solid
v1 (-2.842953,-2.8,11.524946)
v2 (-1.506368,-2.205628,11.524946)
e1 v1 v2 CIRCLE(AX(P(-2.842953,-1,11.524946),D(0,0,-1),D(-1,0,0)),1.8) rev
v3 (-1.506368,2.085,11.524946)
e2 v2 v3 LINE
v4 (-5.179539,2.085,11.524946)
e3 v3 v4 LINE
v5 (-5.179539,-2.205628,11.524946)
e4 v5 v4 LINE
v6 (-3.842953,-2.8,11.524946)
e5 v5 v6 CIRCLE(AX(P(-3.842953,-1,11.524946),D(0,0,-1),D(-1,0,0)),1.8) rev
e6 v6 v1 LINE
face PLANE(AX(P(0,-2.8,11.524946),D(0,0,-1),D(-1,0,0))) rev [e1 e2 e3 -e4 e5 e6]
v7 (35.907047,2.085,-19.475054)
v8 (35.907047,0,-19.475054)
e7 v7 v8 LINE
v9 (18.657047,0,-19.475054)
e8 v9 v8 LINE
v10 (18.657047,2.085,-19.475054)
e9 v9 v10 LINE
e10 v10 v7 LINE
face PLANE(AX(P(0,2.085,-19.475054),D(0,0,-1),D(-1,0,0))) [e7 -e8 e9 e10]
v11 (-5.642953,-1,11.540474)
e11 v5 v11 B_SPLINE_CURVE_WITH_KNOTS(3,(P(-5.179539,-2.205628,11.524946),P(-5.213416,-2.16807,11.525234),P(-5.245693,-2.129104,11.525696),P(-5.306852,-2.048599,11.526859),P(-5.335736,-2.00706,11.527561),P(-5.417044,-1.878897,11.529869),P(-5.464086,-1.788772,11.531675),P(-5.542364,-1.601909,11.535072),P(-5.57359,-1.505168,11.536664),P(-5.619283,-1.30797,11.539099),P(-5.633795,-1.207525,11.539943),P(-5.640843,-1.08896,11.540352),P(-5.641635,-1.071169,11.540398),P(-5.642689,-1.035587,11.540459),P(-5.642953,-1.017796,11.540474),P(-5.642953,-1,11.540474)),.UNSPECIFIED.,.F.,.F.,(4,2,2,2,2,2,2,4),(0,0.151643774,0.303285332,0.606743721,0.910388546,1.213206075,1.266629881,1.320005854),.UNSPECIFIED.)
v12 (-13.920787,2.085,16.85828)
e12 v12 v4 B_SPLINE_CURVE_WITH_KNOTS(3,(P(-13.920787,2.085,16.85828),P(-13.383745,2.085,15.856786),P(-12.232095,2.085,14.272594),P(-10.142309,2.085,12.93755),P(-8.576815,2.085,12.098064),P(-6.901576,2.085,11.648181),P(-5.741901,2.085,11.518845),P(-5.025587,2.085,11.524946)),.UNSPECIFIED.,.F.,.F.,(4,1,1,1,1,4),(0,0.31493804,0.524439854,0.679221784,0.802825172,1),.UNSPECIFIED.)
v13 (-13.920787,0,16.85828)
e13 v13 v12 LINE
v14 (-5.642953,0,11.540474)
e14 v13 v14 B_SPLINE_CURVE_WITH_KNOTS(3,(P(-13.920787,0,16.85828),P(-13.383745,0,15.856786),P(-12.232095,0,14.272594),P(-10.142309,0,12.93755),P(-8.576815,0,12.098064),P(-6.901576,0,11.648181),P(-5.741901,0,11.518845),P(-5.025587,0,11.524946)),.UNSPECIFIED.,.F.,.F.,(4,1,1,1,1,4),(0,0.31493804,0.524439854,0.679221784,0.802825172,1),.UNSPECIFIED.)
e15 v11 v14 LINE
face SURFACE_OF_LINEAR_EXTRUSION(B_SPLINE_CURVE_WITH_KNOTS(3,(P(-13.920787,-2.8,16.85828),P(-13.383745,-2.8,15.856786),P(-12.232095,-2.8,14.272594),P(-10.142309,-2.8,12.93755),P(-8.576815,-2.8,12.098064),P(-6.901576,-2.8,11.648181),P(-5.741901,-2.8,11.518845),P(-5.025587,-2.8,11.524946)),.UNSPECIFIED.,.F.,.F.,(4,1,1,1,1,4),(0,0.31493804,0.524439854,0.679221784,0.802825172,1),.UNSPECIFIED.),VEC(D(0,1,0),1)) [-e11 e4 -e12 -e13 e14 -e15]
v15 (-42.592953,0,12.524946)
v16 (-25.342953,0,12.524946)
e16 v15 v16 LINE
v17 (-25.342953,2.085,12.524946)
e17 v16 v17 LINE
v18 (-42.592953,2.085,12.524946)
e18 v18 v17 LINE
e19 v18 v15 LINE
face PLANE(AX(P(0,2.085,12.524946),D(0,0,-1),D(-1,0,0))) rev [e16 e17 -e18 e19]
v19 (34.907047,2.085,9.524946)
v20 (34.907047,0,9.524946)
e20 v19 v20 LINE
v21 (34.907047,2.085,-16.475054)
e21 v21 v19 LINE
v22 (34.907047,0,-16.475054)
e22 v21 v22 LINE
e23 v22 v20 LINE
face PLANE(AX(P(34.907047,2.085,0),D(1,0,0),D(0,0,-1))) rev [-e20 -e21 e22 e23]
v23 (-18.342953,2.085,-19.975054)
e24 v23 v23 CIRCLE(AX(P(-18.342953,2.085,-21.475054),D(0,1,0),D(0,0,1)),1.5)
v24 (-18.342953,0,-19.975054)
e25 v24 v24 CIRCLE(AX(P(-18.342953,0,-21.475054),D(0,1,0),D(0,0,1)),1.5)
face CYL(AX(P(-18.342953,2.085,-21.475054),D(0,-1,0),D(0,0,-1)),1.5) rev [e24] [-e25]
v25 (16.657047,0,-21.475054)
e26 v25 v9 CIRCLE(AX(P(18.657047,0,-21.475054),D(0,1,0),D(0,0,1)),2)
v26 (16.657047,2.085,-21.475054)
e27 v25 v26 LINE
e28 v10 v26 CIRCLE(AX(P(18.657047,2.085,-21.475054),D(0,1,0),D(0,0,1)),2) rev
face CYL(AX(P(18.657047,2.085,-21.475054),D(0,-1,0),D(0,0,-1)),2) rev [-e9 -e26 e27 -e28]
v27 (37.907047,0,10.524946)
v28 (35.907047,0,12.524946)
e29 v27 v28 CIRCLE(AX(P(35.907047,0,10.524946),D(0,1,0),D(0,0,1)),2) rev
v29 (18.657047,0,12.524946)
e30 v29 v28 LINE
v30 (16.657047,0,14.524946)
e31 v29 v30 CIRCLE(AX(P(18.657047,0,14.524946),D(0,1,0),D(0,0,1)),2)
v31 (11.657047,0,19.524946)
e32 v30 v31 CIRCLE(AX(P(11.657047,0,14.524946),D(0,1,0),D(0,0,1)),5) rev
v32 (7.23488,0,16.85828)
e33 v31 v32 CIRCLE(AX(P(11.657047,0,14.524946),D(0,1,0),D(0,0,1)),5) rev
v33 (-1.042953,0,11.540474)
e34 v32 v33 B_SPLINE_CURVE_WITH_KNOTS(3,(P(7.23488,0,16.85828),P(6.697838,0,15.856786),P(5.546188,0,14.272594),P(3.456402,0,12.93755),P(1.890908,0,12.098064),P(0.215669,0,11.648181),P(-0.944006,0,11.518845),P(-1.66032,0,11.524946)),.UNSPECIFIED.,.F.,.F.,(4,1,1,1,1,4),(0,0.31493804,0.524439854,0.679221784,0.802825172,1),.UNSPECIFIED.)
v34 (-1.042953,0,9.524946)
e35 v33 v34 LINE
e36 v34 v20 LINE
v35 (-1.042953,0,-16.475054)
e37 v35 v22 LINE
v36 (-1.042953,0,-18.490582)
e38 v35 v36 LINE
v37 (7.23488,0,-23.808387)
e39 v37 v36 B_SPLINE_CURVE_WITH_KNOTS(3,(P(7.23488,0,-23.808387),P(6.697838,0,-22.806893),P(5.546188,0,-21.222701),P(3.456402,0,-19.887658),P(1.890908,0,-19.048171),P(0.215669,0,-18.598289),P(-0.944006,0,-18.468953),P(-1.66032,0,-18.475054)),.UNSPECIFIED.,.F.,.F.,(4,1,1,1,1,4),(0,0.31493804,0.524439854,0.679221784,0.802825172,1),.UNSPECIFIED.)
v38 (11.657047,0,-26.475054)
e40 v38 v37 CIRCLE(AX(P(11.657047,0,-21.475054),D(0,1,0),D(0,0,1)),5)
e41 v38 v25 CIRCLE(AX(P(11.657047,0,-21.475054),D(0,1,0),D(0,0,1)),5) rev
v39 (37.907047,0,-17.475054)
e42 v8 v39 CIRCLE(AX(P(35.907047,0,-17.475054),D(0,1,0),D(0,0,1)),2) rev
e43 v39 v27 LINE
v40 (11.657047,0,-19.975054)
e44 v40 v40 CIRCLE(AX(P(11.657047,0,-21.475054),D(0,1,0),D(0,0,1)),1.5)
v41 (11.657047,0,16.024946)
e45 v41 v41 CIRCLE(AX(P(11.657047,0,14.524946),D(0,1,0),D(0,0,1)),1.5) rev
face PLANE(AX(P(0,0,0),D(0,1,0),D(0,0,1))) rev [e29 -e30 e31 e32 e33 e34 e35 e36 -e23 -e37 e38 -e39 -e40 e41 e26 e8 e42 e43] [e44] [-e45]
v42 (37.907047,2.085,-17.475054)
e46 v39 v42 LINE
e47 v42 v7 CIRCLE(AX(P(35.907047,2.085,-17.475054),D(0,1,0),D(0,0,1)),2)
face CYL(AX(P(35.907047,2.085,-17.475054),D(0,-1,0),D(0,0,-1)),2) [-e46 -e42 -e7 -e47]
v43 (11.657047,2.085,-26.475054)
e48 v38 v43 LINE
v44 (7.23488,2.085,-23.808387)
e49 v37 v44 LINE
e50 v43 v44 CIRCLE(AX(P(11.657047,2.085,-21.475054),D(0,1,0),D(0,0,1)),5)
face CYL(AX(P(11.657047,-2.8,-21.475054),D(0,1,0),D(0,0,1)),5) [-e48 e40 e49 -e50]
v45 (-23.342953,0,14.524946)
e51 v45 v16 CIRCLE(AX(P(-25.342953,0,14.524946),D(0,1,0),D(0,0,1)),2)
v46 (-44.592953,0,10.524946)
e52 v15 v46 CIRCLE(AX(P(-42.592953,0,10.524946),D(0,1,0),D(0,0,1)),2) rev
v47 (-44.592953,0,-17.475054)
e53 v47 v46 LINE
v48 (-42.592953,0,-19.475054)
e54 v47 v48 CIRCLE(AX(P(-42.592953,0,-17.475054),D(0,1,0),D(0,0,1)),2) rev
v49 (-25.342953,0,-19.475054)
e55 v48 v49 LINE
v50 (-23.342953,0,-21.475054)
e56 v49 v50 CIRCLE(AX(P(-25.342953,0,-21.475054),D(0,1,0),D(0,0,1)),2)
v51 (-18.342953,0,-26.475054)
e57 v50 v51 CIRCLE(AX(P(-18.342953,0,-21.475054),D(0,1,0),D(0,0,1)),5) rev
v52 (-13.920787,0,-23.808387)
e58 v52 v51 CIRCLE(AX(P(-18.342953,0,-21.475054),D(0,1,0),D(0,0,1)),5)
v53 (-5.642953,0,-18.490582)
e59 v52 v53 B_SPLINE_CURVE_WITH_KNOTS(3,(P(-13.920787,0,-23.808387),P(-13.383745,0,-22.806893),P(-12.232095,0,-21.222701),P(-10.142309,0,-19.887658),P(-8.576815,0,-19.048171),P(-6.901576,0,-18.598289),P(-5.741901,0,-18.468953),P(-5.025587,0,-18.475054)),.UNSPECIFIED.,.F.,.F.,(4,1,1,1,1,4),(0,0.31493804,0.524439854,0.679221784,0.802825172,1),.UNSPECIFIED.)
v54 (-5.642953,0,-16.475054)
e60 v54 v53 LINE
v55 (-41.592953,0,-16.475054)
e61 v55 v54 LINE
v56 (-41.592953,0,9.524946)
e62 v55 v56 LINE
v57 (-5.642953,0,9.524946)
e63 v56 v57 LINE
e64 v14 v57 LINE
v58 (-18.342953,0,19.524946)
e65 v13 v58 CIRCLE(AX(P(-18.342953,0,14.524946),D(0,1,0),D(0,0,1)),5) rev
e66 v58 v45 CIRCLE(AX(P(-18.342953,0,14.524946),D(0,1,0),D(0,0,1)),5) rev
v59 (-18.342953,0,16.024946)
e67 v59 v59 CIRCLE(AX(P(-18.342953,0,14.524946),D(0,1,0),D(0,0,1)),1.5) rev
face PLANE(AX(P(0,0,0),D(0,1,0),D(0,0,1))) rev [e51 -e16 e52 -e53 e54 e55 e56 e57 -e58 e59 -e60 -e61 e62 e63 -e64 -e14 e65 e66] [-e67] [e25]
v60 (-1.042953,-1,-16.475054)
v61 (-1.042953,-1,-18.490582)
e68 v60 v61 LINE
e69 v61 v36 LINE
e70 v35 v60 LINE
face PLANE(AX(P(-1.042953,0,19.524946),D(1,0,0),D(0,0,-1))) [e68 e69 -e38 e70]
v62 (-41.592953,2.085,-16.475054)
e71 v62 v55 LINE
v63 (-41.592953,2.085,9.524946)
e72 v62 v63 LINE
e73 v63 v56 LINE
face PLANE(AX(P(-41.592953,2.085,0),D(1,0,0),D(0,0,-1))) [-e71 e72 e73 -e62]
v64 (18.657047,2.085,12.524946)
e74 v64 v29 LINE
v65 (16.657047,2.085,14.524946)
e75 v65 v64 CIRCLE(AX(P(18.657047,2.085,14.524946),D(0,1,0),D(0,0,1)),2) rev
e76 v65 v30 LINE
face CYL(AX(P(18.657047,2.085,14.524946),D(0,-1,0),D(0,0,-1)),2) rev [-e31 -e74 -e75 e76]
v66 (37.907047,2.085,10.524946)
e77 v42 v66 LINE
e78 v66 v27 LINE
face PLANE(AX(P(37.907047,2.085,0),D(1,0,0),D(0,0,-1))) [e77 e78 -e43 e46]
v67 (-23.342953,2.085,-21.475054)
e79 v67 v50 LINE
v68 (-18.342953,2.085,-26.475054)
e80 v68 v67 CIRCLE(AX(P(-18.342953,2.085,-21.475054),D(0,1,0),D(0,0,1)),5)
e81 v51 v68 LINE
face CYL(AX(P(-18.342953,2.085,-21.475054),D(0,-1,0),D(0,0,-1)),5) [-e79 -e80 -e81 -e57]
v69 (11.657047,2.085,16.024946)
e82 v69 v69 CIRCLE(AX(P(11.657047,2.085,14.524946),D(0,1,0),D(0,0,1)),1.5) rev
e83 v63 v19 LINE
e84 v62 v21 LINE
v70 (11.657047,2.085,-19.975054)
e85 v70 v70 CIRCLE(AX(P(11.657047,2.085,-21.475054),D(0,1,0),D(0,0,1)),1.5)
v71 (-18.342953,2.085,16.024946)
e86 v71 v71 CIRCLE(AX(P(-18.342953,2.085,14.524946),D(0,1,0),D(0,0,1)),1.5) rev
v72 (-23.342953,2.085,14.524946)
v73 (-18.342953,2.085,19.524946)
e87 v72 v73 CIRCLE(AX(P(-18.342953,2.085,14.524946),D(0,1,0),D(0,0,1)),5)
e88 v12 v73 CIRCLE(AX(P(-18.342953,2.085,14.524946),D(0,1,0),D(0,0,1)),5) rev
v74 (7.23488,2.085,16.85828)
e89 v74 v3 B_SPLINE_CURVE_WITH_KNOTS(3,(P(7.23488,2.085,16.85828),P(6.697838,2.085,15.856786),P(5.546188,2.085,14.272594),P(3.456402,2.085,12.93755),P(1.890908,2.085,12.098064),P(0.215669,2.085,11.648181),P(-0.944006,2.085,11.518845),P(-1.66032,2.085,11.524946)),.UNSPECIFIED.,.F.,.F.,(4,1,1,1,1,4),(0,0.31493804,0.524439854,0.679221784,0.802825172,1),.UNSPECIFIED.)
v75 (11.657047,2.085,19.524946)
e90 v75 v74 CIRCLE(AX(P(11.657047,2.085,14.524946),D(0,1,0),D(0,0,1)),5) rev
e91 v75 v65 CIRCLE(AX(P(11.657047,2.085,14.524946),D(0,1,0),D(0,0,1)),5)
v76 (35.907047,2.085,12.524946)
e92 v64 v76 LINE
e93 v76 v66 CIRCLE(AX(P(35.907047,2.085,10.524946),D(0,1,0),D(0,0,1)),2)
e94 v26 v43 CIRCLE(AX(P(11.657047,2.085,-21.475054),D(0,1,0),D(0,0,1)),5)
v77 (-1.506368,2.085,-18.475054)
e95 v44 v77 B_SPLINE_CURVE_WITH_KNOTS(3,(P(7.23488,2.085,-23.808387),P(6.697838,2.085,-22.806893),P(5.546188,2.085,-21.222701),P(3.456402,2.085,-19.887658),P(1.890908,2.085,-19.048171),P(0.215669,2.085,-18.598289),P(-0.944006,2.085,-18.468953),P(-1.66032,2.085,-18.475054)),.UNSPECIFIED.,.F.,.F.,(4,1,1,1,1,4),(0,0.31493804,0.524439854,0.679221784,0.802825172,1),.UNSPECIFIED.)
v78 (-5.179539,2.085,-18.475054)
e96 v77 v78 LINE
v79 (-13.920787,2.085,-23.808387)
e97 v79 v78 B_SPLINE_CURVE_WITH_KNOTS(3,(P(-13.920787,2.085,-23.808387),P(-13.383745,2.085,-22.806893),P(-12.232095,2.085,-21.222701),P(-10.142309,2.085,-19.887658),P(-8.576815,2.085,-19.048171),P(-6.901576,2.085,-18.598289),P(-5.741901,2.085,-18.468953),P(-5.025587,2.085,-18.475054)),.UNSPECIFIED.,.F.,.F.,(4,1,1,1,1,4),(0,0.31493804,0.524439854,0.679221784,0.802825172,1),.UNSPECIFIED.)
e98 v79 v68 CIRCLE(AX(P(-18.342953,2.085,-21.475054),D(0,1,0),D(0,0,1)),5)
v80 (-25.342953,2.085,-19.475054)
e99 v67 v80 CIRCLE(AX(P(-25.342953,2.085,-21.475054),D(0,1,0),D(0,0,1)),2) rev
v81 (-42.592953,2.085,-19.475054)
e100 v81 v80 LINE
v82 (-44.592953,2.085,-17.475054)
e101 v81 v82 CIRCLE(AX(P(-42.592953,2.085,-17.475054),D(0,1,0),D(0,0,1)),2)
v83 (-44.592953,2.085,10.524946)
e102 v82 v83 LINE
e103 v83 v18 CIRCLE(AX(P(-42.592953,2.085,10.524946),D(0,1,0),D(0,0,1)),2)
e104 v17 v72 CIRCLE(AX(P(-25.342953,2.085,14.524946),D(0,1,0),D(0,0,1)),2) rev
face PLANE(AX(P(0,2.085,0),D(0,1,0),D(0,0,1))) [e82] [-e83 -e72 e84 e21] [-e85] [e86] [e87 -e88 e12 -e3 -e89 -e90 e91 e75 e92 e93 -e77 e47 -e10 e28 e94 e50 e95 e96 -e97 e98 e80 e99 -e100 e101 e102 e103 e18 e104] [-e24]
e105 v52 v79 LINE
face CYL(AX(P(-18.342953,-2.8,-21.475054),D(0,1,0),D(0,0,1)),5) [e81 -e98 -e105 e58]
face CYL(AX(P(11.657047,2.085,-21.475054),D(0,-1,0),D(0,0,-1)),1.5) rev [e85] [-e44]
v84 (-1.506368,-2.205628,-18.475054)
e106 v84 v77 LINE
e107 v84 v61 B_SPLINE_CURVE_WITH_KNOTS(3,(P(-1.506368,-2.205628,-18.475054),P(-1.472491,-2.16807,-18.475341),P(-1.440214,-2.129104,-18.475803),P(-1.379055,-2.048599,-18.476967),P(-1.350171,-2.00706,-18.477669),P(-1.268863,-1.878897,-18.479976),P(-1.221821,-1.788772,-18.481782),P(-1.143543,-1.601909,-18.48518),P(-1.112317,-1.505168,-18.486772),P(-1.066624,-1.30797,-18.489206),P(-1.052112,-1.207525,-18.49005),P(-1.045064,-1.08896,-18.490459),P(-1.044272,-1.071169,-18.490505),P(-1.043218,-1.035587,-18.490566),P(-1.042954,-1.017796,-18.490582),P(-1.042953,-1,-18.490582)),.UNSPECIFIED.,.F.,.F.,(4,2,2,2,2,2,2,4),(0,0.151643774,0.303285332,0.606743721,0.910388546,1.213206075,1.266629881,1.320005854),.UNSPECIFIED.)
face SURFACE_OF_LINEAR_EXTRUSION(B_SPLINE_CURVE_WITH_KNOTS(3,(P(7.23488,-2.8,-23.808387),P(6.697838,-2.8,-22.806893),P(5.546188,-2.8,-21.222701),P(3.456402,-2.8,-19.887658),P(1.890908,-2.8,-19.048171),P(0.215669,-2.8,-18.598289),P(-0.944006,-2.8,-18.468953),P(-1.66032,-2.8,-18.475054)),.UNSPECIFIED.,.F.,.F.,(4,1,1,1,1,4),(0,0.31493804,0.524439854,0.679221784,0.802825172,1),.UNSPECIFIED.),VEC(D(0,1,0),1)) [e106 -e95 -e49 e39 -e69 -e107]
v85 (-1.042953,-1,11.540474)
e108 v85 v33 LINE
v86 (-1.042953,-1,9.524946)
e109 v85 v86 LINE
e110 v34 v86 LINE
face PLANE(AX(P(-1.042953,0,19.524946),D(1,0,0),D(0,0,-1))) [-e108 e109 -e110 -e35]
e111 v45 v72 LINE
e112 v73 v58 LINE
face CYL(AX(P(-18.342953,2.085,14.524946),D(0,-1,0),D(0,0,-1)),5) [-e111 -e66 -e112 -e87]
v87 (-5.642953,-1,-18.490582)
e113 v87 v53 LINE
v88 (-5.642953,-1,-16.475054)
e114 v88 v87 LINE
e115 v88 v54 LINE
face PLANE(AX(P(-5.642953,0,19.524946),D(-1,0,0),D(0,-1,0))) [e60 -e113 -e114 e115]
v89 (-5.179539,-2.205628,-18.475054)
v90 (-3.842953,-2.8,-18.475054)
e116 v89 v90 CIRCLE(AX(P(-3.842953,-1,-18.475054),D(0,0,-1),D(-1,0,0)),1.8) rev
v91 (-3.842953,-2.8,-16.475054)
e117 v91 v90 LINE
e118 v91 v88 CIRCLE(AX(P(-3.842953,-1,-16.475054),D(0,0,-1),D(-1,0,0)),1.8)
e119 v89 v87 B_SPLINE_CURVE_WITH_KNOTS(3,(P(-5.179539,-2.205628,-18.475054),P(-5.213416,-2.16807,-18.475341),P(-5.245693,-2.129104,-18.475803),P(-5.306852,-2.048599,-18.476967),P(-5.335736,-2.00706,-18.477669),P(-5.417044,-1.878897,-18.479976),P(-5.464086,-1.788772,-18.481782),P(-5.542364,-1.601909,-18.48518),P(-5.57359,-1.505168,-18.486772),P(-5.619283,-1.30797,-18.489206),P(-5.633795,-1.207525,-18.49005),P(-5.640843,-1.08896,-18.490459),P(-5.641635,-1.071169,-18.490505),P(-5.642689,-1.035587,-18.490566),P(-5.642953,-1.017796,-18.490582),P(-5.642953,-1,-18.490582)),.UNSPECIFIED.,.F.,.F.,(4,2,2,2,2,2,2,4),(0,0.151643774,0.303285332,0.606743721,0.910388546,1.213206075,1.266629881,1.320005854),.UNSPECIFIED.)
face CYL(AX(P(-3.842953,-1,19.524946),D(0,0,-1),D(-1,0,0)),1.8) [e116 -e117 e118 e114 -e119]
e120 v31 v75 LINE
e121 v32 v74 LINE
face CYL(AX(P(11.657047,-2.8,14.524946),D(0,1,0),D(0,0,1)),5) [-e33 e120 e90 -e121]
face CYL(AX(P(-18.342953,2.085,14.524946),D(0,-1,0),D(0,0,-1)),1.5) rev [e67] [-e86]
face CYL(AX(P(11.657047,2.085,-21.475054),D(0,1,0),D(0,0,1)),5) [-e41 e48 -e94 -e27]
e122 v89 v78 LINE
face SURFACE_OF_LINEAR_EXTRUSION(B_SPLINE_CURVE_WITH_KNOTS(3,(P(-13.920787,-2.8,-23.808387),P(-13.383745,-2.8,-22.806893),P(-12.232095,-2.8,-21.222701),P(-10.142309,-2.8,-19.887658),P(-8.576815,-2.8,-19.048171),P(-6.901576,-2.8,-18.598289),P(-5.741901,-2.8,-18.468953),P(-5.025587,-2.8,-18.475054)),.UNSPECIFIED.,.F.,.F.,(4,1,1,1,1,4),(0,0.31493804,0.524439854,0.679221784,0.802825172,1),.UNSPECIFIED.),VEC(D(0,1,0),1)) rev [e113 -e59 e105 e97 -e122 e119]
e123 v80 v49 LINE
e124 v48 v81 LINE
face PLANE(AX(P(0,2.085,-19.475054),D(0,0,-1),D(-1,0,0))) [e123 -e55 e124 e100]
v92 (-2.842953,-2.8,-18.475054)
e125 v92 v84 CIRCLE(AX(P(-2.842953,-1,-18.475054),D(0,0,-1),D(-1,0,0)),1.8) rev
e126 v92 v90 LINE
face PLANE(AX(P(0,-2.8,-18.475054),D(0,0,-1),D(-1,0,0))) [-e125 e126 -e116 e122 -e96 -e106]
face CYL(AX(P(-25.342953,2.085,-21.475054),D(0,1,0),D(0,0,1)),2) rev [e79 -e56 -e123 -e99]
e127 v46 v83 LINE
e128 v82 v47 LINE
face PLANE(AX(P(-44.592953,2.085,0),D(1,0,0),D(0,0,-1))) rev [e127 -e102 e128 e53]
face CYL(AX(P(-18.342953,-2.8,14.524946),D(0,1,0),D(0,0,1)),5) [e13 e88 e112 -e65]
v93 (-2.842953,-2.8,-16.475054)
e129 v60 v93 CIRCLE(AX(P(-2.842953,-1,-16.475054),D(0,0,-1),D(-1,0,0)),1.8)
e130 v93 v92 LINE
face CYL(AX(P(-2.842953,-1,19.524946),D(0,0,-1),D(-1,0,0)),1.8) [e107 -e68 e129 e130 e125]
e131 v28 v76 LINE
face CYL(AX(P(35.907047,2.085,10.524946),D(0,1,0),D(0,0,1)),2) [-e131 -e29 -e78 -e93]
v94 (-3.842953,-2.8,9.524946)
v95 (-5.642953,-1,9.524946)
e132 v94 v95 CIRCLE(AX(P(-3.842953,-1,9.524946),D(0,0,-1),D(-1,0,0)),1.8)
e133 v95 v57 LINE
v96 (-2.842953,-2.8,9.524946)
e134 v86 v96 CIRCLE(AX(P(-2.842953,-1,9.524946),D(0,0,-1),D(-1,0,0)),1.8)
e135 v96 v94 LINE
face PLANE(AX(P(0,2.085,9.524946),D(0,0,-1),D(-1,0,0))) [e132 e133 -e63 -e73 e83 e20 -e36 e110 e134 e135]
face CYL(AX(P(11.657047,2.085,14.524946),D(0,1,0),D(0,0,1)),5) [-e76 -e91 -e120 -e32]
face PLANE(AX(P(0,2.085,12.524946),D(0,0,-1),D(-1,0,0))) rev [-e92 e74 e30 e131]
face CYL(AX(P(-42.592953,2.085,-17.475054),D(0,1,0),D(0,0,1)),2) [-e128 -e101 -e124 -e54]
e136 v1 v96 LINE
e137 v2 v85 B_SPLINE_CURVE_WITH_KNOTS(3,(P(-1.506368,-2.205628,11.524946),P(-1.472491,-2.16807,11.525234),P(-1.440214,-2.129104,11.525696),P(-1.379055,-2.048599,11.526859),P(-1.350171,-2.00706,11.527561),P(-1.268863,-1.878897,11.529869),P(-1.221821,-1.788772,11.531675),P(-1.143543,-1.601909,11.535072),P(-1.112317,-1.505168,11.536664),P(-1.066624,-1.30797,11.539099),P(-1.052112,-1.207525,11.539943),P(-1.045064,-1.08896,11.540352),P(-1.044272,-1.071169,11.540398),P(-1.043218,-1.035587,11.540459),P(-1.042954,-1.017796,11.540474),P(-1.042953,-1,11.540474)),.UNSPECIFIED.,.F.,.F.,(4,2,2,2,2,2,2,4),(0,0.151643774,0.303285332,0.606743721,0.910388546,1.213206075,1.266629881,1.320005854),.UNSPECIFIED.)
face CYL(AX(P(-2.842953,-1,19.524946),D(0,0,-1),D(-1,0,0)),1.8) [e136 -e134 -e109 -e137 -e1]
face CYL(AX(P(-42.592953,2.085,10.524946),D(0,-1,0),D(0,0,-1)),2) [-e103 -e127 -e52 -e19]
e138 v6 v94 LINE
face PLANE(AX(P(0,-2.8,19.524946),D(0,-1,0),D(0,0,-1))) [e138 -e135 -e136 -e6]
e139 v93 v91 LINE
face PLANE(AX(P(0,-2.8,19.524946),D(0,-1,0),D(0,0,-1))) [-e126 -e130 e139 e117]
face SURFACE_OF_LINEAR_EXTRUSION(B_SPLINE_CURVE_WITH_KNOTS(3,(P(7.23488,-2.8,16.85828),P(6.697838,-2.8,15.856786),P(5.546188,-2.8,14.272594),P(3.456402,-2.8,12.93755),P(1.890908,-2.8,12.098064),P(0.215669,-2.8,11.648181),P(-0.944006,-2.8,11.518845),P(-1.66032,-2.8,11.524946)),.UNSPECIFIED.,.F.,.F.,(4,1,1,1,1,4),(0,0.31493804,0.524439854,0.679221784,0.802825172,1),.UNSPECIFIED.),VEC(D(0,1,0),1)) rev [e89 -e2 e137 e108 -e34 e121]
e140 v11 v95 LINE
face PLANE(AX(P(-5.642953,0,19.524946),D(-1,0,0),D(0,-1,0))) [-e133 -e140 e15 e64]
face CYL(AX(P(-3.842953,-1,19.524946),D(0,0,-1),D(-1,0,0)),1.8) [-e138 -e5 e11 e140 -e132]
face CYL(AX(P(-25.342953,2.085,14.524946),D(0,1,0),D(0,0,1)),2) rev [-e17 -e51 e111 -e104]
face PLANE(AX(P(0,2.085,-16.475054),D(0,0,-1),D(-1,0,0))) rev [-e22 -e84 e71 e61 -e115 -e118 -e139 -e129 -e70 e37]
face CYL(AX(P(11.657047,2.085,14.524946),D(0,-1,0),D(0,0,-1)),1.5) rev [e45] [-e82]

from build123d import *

# Parameters (mm, degrees)
SKETCH1_W           = 40
SKETCH1_H           = 7
SKETCH1_R           = 1.5
SKETCH1_W_2         = 82.5
SKETCH1_H_2         = 32
SKETCH1_W_3         = 76.5
SKETCH1_H_3         = 26
BOSS_EXTRUDE1_DEPTH = 2.085
SKETCH2_W           = 5
SKETCH2_H           = 10
BOSS_EXTRUDE2_DEPTH = 3
FILLET1_R           = 2
FILLET2_R           = 2
CUT_EXTRUDE1_DEPTH  = 65.136818612
SKETCH4_W           = 30
SKETCH4_H           = 6.817038716
CUT_EXTRUDE2_DEPTH  = 53.089568977
FILLET3_R           = 5
FILLET4_R           = 2


with BuildPart() as part:
    # Sketch1 → Boss-Extrude1 (new body)
    # profile 1 of 3: a face of its own
    with BuildSketch(Plane(origin=(0, 0, 0), x_dir=(1, 0, 0), z_dir=(0, 1, 0))):
        with Locations((-3.342953498, -16.024946279)):
            Rectangle(SKETCH1_W, SKETCH1_H)
        with Locations(Location((-18.342953498, -14.524946279, 0), (0, 0, 270))):
            Circle(SKETCH1_R, mode=Mode.SUBTRACT)
        with Locations(Location((11.657046502, -14.524946279, 0), (0, 0, 270))):
            Circle(SKETCH1_R, mode=Mode.SUBTRACT)
    # profile 2 of 3: a face of its own
    with BuildSketch(Plane(origin=(0, 0, 0), x_dir=(1, 0, 0), z_dir=(0, 1, 0))):
        with Locations((-3.342953498, 3.475053721)):
            Rectangle(SKETCH1_W_2, SKETCH1_H_2)
        with Locations((-3.342953498, 3.475053721)):
            Rectangle(SKETCH1_W_3, SKETCH1_H_3, mode=Mode.SUBTRACT)
    # profile 3 of 3: a face of its own
    with BuildSketch(Plane(origin=(0, 0, 0), x_dir=(1, 0, 0), z_dir=(0, 1, 0))):
        with Locations((-3.342953498, 22.975053721)):
            Rectangle(SKETCH1_W, SKETCH1_H)
        with Locations(Location((-18.342953498, 21.475053721, 0), (0, 0, 270))):
            Circle(SKETCH1_R, mode=Mode.SUBTRACT)
        with Locations(Location((11.657046502, 21.475053721, 0), (0, 0, 270))):
            Circle(SKETCH1_R, mode=Mode.SUBTRACT)
    extrude(amount=BOSS_EXTRUDE1_DEPTH)

    # Sketch2 → Boss-Extrude2 (add)
    with BuildSketch(Plane.XZ):
        with Locations((-3.342953498, 14.524946279)):
            Rectangle(SKETCH2_W, SKETCH2_H)
        with Locations((-3.342953498, -21.475053721)):
            Rectangle(SKETCH2_W, SKETCH2_H)
    extrude(amount=BOSS_EXTRUDE2_DEPTH)

    # Fillet1
    fillet1_edges = [part.edges().sort_by_distance(p)[0] for p in [
        (-5.842953498, -3, 14.524946279),
        (-0.842953498, -3, 14.524946279),
        (-0.842953498, -3, -21.475053721),
        (-5.842953498, -3, -21.475053721),
    ]]
    fillet(fillet1_edges, radius=FILLET1_R)

    # Fillet2
    fillet2_edges = [part.edges().sort_by_distance(p)[0] for p in [
        (-44.592953498, 1.0425, 12.524946279),
        (-44.592953498, 1.0425, -19.475053721),
        (37.907046502, 1.0425, -19.475053721),
        (37.907046502, 1.0425, 12.524946279),
    ]]
    fillet(fillet2_edges, radius=FILLET2_R)

    # Sketch3 → Cut-Extrude1 (cut, through all)
    with BuildSketch(Plane(origin=(0, 0, -26.475053721), x_dir=(-1, 0, 0), z_dir=(0, 0, -1))):
        with BuildLine():
            Line((5.842953498, -1), (5.842953498, 0))
            Line((5.842953498, 0), (5.642953498, 0))
            Line((5.642953498, 0), (5.642953498, -1))
            ThreePointArc((5.642953498, -1), (5.115745704, -2.272792206), (3.842953498, -2.8))
            Line((3.842953498, -2.8), (2.842953498, -2.8))
            ThreePointArc((2.842953498, -2.8), (1.570161291, -2.272792206), (1.042953498, -1))
            Line((1.042953498, -1), (1.042953498, 0))
            Line((1.042953498, 0), (0.842953498, 0))
            Line((0.842953498, 0), (0.842953498, -1))
            ThreePointArc((0.842953498, -1), (1.428739935, -2.414213562), (2.842953498, -3))
            Line((2.842953498, -3), (3.842953498, -3))
            ThreePointArc((3.842953498, -3), (5.25716706, -2.414213562), (5.842953498, -1))
        make_face()
    extrude(amount=-CUT_EXTRUDE1_DEPTH, mode=Mode.SUBTRACT)

    # Sketch4 → Cut-Extrude2 (cut, through all)
    with BuildSketch(Plane(origin=(0, 2.085, 0), x_dir=(1, 0, 0), z_dir=(0, 1, 0))):
        with BuildLine():
            Line((-5.025587433, 18.475053721), (-3.342953498, 18.475053721))
            Line((-3.342953498, 18.475053721), (-1.660319563, 18.475053721))
            Line((-1.660319563, 18.475053721), (-1.5063675, 18.475053721))
            add(Edge.make_bspline(
                [(7.234880115, 23.808387054), (6.697838422, 22.80689338), (5.54618786, 21.222701251), (3.456402004, 19.887657692), (1.890908212, 19.048171258), (0.265447838, 18.611656881), (-0.841891354, 18.480685845), (-1.5063675, 18.475053721)],
                knots=[0, 0, 0, 0, 0.31493804, 0.524439854, 0.679221784, 0.802825172, 0.985869019, 0.985869019, 0.985869019, 0.985869019], degree=3))
            ThreePointArc((7.234880115, 23.808387054), (9.075057605, 25.756797914), (11.657046502, 26.475053721))
            Line((11.657046502, 26.475053721), (-18.342953498, 26.475053721))
            ThreePointArc((-18.342953498, 26.475053721), (-15.7609646, 25.756797914), (-13.92078711, 23.808387054))
            add(Edge.make_bspline(
                [(-13.92078711, 23.808387054), (-13.383745417, 22.80689338), (-12.232094855, 21.222701251), (-10.142308999, 19.887657692), (-8.576815207, 19.048171258), (-6.951354833, 18.611656881), (-5.844015641, 18.480685845), (-5.179539495, 18.475053721)],
                knots=[0, 0, 0, 0, 0.31493804, 0.524439854, 0.679221784, 0.802825172, 0.985869019, 0.985869019, 0.985869019, 0.985869019], degree=3))
            Line((-5.179539495, 18.475053721), (-5.025587433, 18.475053721))
        make_face()
        with Locations((-3.342953498, 29.883573079)):
            Rectangle(SKETCH4_W, SKETCH4_H)
        with BuildLine():
            ThreePointArc((-13.92078711, -16.858279612), (-15.7609646, -18.806690472), (-18.342953498, -19.524946279))
            Line((-18.342953498, -19.524946279), (11.657046502, -19.524946279))
            ThreePointArc((11.657046502, -19.524946279), (9.075057605, -18.806690472), (7.234880115, -16.858279612))
            add(Edge.make_bspline(
                [(7.234880115, -16.858279612), (6.697838422, -15.856785937), (5.54618786, -14.272593809), (3.456402004, -12.937550249), (1.890908212, -12.098063816), (0.265447838, -11.661549439), (-0.841891354, -11.530578403), (-1.5063675, -11.524946279)],
                knots=[0, 0, 0, 0, 0.31493804, 0.524439854, 0.679221784, 0.802825172, 0.985869019, 0.985869019, 0.985869019, 0.985869019], degree=3))
            Line((-1.5063675, -11.524946279), (-1.660319563, -11.524946279))
            Line((-1.660319563, -11.524946279), (-3.342953498, -11.524946279))
            Line((-3.342953498, -11.524946279), (-5.025587433, -11.524946279))
            Line((-5.025587433, -11.524946279), (-5.179539495, -11.524946279))
            add(Edge.make_bspline(
                [(-13.92078711, -16.858279612), (-13.383745417, -15.856785937), (-12.232094855, -14.272593809), (-10.142308999, -12.937550249), (-8.576815207, -12.098063816), (-6.951354833, -11.661549439), (-5.844015641, -11.530578403), (-5.179539495, -11.524946279)],
                knots=[0, 0, 0, 0, 0.31493804, 0.524439854, 0.679221784, 0.802825172, 0.985869019, 0.985869019, 0.985869019, 0.985869019], degree=3))
        make_face()
        with Locations((-3.342953498, -22.933465637)):
            Rectangle(SKETCH4_W, SKETCH4_H)
    extrude(amount=-CUT_EXTRUDE2_DEPTH, mode=Mode.SUBTRACT)

    # Fillet3
    fillet3_edges = [part.edges().sort_by_distance(p)[0] for p in [
        (16.657046502, 1.0425, -26.475053721),
        (-23.342953498, 1.0425, -26.475053721),
        (-23.342953498, 1.0425, 19.524946279),
        (16.657046502, 1.0425, 19.524946279),
    ]]
    fillet(fillet3_edges, radius=FILLET3_R - 0.0001)  # a hair under: the kernel refuses the full size

    # Fillet4
    fillet4_edges = [part.edges().sort_by_distance(p)[0] for p in [
        (16.657046502, 1.0425, 12.524946279),
        (-23.342953498, 1.0425, 12.524946279),
        (-23.342953498, 1.0425, -19.475053721),
        (16.657046502, 1.0425, -19.475053721),
    ]]
    fillet(fillet4_edges, radius=FILLET4_R)


solid = part.part
